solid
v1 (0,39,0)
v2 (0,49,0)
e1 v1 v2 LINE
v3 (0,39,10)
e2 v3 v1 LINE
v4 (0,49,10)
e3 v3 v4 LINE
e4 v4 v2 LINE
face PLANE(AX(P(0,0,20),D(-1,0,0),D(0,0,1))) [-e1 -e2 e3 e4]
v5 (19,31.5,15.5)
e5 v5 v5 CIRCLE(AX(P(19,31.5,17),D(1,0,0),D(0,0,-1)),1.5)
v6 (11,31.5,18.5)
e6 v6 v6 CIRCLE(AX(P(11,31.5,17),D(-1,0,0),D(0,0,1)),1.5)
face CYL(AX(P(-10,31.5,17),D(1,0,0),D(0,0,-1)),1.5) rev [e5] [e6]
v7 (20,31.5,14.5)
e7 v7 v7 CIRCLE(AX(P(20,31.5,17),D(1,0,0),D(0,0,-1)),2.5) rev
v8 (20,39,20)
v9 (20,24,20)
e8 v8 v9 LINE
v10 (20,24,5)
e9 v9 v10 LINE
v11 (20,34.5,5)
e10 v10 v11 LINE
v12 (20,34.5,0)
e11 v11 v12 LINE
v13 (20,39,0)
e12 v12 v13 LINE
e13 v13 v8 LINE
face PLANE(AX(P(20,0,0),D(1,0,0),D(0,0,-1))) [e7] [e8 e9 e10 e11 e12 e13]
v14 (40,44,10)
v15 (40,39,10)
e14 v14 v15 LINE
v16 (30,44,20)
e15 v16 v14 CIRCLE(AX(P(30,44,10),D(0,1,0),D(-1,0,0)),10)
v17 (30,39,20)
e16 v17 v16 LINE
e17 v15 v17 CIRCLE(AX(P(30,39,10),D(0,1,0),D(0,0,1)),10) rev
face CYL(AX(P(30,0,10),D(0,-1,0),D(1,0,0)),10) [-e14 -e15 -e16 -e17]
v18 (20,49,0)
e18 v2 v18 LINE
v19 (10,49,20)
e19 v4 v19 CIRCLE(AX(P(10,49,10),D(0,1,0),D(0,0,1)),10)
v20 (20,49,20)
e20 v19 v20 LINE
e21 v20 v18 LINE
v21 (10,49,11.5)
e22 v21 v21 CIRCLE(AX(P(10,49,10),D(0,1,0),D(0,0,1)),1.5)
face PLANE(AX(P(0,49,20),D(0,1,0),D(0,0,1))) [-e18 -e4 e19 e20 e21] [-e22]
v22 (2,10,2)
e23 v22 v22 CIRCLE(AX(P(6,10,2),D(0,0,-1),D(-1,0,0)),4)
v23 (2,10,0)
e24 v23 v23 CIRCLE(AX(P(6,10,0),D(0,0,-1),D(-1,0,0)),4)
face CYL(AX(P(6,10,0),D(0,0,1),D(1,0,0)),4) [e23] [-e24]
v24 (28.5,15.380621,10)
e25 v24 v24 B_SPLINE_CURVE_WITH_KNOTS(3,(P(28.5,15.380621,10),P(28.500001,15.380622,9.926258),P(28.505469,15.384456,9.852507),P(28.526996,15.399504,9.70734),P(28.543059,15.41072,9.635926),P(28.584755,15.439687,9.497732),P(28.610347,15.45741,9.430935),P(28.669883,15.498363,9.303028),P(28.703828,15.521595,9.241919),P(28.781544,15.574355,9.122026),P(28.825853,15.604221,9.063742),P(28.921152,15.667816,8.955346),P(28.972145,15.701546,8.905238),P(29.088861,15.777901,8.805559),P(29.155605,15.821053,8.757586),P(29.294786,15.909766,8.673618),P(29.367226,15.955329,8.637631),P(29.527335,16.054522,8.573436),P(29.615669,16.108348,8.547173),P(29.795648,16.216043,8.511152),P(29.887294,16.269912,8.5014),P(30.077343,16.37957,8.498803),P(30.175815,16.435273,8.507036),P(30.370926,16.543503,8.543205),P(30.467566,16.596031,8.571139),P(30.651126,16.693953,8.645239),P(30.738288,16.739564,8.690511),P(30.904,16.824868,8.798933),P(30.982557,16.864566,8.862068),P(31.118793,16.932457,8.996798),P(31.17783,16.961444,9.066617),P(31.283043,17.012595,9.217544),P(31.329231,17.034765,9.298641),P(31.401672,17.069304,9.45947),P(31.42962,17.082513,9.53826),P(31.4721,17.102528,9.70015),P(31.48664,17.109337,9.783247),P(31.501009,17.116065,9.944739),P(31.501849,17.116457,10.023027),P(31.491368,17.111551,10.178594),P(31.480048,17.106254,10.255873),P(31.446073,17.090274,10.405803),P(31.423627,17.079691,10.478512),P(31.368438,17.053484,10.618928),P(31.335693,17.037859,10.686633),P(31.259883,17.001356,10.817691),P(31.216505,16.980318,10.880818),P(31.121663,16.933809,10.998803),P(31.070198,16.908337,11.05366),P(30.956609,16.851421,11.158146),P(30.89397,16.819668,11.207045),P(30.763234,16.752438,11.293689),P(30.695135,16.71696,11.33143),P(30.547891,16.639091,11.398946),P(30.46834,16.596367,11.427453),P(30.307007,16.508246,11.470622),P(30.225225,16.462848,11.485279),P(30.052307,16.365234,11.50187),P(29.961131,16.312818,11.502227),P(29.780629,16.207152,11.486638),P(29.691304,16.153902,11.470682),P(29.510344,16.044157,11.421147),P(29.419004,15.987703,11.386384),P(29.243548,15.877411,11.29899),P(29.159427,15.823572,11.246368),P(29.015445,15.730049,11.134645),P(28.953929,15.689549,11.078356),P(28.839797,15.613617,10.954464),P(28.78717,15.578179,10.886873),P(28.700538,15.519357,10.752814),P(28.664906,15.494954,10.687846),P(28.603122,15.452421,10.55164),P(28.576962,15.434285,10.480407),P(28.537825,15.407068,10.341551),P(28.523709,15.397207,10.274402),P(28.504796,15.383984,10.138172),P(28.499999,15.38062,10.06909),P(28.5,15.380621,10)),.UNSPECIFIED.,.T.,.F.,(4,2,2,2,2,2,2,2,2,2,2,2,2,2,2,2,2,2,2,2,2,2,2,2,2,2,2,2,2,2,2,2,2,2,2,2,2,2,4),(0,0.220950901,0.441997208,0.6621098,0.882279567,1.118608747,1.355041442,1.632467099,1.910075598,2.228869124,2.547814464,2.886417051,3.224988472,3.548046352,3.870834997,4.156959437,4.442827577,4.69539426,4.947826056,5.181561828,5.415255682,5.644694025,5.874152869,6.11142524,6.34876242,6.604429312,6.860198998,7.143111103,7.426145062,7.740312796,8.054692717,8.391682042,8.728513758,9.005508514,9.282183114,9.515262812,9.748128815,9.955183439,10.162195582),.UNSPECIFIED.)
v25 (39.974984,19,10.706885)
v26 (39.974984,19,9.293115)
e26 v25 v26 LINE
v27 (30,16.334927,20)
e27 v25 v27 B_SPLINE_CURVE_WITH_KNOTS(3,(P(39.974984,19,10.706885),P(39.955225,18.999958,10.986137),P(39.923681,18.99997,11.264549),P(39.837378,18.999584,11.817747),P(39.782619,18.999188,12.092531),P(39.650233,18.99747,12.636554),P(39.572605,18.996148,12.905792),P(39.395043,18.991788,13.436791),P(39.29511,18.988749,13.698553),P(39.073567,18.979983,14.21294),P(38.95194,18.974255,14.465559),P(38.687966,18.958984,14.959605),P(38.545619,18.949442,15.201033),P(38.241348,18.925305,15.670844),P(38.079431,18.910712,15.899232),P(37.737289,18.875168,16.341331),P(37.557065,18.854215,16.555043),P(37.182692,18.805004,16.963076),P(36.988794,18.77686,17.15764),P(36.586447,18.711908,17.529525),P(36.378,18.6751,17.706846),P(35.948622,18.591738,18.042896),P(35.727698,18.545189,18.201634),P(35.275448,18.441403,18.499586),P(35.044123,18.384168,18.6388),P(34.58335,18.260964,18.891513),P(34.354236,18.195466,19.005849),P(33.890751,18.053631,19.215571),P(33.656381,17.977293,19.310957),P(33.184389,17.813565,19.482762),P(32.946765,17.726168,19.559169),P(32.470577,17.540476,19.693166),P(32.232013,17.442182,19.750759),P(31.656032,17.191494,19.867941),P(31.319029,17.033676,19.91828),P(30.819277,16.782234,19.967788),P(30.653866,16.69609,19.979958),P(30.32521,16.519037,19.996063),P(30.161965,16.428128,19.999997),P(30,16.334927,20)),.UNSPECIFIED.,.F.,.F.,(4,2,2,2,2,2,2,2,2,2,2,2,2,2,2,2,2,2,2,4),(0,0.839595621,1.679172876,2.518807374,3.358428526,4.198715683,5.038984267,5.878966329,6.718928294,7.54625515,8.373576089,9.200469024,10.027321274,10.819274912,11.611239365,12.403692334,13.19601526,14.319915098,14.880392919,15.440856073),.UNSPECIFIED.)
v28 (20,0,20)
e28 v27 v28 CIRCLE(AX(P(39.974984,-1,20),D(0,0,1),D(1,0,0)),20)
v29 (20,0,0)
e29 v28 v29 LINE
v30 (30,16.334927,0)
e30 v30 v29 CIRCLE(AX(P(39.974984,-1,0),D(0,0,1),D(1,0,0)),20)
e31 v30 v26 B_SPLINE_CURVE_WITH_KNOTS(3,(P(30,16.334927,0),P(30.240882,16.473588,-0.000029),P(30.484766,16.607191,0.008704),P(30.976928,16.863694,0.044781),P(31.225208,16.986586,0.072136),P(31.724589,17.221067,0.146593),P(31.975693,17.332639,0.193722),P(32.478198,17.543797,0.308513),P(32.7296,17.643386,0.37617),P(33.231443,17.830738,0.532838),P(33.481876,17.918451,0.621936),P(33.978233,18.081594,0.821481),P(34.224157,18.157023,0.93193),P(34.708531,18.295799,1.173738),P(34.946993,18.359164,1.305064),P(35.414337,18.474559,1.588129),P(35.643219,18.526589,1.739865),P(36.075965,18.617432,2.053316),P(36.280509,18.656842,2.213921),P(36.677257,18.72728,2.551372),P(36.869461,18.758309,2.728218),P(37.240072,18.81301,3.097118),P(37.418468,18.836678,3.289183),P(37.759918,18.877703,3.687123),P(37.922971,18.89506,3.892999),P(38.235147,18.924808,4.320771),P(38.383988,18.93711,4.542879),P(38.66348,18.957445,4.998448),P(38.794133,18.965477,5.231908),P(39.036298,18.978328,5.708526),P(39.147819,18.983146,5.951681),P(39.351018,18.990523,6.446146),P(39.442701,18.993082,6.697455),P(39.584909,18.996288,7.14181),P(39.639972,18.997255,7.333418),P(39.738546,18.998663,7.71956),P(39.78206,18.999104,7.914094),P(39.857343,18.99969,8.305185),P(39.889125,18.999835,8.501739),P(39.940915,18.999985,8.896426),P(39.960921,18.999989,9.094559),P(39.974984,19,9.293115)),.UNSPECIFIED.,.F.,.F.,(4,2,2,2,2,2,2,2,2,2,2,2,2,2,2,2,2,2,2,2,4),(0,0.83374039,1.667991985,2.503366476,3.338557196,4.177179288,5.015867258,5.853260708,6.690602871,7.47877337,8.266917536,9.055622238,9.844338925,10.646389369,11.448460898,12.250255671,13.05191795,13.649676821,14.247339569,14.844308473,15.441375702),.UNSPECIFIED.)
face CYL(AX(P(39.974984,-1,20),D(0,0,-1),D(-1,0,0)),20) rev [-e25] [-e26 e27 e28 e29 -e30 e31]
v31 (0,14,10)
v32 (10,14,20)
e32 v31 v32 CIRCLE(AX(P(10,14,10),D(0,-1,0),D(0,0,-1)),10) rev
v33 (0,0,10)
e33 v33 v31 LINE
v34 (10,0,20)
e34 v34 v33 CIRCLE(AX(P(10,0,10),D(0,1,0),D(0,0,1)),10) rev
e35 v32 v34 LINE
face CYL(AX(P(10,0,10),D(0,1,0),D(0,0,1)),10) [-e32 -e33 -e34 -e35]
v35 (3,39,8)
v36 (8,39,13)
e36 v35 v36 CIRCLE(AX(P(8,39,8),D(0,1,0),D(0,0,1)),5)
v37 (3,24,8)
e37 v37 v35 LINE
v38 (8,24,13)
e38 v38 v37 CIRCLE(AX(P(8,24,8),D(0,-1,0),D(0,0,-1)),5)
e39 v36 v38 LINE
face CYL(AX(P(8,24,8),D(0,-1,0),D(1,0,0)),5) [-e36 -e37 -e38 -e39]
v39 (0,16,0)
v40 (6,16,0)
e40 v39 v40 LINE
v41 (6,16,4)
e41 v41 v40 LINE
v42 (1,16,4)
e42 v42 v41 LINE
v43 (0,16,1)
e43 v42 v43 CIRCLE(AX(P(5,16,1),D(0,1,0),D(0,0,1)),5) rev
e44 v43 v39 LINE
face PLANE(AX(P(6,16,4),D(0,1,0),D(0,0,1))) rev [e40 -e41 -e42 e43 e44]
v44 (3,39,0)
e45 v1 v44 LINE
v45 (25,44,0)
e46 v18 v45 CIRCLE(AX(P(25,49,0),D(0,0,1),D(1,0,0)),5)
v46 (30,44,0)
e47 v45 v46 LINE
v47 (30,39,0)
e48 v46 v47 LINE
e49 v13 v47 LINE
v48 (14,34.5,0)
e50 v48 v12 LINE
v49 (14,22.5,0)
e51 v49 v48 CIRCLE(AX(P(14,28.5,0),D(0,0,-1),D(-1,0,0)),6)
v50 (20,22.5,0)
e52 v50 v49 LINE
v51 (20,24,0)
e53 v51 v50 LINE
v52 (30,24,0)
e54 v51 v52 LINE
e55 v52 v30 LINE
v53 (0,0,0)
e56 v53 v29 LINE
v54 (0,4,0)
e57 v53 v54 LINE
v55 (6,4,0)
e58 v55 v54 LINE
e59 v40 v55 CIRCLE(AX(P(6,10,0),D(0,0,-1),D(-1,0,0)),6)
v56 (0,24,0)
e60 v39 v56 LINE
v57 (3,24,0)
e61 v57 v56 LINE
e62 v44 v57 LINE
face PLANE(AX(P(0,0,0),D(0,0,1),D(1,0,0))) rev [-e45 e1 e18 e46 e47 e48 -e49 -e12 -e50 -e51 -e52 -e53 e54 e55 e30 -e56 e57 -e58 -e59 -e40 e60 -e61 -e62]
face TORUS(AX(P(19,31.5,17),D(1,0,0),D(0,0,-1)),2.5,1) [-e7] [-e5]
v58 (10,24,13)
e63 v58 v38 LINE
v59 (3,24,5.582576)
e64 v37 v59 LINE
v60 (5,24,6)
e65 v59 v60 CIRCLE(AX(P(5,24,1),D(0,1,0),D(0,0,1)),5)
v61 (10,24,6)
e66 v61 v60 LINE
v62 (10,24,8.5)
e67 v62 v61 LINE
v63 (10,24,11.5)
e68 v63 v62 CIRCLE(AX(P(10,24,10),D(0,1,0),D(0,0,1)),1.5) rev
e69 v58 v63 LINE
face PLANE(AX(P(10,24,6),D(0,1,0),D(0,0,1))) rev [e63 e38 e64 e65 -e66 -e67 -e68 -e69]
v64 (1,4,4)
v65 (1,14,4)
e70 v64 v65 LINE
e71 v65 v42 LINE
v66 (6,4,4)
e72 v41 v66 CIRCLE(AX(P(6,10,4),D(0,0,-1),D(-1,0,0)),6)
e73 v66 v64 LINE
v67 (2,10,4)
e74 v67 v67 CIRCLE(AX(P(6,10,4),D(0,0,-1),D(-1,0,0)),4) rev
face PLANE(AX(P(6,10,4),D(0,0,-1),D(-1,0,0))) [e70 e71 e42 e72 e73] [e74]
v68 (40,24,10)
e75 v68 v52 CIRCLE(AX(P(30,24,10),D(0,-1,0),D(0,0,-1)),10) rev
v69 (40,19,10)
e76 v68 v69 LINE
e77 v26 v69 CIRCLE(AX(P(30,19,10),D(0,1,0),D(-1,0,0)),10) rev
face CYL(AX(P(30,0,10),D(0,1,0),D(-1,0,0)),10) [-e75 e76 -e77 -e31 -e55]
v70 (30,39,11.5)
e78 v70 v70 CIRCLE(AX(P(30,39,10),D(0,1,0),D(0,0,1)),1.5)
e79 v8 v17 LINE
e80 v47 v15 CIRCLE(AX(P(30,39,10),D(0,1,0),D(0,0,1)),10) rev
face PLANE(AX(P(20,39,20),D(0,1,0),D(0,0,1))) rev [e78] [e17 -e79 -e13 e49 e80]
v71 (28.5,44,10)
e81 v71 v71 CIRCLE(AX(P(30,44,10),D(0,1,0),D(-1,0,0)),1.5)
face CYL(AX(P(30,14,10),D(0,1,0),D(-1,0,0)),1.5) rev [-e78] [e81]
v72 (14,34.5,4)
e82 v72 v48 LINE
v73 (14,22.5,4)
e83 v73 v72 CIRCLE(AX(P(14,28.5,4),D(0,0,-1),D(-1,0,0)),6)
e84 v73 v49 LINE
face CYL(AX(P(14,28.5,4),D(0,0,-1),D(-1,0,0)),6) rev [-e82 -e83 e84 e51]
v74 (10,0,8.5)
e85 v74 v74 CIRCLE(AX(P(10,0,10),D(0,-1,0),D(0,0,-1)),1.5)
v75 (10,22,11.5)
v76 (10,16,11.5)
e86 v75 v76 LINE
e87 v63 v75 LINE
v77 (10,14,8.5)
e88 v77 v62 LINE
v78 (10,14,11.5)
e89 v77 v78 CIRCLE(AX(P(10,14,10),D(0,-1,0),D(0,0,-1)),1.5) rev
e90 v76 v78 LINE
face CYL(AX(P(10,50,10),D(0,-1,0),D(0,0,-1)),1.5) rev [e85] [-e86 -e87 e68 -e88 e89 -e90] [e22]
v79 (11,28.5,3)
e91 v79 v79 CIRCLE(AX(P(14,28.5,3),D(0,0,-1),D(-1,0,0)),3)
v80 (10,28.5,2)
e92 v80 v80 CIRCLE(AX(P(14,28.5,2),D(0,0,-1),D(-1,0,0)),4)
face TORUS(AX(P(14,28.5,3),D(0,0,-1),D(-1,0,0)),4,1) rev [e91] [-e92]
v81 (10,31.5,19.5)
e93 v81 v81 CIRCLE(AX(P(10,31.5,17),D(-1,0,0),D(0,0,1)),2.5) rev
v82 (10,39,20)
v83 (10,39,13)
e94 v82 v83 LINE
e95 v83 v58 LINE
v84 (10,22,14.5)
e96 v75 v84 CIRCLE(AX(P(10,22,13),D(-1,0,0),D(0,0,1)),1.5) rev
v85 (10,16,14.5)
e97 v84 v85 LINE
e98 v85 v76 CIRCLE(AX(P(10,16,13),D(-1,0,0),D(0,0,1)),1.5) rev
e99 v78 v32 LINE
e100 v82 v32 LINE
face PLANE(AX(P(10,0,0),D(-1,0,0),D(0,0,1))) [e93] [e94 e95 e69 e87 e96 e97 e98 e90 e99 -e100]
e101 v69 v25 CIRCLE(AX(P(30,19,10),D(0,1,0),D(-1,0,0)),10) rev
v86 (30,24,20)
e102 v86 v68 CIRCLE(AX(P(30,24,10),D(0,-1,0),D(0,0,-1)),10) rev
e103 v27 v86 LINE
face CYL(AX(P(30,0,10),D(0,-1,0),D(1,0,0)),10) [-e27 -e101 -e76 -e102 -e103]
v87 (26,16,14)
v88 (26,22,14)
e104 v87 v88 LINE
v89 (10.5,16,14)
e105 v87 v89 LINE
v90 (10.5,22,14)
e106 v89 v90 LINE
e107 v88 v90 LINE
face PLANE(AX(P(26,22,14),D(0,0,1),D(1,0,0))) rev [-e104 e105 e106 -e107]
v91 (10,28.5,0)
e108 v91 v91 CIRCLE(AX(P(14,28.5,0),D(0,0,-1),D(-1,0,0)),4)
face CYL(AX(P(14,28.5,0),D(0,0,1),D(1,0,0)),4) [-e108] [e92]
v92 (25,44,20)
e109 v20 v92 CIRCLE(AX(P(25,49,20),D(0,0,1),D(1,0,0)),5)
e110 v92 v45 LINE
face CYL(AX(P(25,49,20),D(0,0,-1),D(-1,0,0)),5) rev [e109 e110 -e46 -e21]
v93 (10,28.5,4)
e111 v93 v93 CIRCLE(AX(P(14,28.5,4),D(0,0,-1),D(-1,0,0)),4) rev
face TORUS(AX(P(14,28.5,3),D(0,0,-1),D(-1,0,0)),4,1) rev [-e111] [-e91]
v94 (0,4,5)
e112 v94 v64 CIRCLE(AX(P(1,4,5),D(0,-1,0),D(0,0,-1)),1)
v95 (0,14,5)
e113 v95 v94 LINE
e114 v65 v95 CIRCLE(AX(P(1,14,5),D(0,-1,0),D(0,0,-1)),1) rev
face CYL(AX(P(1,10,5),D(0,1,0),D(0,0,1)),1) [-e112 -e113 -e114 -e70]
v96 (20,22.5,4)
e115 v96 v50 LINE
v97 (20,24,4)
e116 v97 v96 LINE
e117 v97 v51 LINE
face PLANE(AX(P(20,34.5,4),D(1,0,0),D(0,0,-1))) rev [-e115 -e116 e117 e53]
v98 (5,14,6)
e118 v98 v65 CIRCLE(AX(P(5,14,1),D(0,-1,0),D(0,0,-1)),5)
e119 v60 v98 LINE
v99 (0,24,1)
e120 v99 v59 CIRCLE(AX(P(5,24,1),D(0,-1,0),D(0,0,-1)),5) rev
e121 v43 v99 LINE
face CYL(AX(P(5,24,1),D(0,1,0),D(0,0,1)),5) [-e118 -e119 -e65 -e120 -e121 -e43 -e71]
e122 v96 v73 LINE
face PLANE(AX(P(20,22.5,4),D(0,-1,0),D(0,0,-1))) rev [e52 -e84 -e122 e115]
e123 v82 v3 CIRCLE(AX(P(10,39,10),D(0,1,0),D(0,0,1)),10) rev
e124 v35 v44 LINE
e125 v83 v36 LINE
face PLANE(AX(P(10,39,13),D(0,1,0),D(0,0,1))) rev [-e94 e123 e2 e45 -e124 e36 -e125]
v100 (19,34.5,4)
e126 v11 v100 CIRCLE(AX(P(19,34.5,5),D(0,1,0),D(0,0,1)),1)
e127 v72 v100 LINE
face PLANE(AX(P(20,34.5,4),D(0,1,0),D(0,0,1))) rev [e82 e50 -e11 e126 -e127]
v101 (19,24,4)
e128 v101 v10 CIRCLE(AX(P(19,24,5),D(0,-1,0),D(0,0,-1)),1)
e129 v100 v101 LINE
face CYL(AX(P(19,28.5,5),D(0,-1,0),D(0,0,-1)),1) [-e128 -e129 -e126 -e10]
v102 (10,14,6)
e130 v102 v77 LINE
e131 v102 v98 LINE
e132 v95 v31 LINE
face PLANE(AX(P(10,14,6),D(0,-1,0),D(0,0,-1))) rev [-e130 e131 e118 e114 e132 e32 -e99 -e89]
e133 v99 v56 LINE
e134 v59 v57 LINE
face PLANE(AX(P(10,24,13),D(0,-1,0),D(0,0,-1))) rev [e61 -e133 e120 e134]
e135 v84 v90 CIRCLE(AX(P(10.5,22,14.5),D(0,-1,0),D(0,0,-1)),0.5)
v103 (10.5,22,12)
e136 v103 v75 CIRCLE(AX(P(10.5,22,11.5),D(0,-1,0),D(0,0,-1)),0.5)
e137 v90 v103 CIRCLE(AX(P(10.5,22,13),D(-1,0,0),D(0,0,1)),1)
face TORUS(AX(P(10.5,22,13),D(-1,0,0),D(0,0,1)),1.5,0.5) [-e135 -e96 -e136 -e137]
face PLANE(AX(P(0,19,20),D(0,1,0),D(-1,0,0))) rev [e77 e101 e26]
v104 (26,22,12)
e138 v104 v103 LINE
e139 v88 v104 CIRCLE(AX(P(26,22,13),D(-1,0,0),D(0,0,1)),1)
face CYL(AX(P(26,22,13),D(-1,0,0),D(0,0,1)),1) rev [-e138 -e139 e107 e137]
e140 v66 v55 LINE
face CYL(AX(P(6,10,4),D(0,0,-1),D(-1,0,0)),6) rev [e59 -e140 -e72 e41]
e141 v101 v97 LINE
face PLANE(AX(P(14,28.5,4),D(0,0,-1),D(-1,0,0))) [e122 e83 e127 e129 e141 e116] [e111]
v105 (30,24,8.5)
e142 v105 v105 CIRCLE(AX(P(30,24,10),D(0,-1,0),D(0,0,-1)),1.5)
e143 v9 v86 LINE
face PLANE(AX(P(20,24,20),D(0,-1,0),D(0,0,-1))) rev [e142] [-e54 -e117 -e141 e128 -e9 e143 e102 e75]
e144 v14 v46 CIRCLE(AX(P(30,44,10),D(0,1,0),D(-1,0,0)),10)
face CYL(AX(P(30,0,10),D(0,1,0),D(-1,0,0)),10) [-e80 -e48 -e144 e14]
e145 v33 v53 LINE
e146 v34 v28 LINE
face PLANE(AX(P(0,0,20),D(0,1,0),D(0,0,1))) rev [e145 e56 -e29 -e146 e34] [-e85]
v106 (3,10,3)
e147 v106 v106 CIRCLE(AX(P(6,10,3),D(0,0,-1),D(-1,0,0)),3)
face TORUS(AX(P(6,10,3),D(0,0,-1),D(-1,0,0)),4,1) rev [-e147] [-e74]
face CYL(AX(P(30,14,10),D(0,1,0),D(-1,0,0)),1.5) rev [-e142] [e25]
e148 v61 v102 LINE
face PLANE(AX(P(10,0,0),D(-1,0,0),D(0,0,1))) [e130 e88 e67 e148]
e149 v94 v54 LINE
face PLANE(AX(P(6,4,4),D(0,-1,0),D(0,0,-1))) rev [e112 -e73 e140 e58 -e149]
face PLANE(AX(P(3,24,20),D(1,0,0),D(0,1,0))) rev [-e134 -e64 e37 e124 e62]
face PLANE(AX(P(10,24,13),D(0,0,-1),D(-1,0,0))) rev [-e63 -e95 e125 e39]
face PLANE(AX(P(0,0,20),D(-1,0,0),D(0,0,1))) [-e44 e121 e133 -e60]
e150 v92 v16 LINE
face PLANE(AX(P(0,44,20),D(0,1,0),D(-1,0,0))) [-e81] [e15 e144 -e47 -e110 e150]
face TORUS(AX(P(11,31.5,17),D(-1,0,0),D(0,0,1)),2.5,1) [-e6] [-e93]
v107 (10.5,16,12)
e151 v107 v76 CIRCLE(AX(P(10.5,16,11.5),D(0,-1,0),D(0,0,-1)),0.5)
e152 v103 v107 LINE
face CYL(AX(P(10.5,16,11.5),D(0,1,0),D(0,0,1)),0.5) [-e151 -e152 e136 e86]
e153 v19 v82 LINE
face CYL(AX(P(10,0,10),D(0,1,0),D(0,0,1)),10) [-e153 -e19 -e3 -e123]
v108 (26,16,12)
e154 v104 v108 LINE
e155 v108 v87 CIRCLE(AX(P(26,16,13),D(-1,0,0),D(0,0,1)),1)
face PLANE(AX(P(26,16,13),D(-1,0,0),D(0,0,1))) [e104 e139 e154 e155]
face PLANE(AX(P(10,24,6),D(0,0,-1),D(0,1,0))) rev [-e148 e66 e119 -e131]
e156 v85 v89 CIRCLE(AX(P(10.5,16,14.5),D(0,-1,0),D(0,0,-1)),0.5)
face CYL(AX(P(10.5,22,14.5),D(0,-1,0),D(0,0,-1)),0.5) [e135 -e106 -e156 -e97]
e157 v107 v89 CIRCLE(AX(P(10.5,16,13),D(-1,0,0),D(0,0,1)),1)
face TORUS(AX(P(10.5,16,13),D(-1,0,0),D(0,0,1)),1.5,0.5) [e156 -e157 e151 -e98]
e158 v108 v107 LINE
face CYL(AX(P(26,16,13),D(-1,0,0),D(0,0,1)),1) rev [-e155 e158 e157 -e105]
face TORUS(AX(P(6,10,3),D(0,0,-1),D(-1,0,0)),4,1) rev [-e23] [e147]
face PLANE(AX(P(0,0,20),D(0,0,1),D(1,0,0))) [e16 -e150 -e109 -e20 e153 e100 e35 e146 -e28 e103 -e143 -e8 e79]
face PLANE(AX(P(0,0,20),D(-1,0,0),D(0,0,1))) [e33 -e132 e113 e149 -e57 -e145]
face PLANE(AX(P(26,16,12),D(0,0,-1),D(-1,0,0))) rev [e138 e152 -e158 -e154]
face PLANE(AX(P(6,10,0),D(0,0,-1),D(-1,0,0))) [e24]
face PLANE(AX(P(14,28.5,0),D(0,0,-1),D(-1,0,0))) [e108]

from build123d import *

# Parameters (mm, degrees)
SALIENTE_EXTRUIR1_DEPTH = 20
CROQUIS2_R              = 1.5
CORTAR_EXTRUIR1_DEPTH   = 50
CROQUIS5_W              = 20
CROQUIS5_H              = 15
CORTAR_EXTRUIR3_DEPTH   = 20
CROQUIS7_R              = 1.5
CORTAR_EXTRUIR5_DEPTH   = 30
REDONDEO2_DEPTH         = 49
CROQUIS6_R              = 1.5
CORTAR_EXTRUIR4_DEPTH   = 30
REDONDEO3_R             = 10
CROQUIS8_W              = 7
CROQUIS8_H              = 15
CORTAR_EXTRUIR6_DEPTH   = 10
SKETCH1_W               = 3
SKETCH1_H               = 15
CUT_EXTRUDE1_DEPTH      = 20
FILLET1_R               = 5
CUT_EXTRUDE2_DEPTH      = 4
SKETCH5_W               = 14
SKETCH5_H               = 10
CUT_EXTRUDE3_DEPTH      = 10
FILLET6_R               = 5
CUT_EXTRUDE4_DEPTH      = 16
SKETCH3_R               = 3
BOSS_EXTRUDE1_DEPTH     = 2
SKETCH4_R               = 4
BOSS_EXTRUDE2_DEPTH     = 2
FILLET2_R               = 1
FILLET3_R               = 1
FILLET4_R               = 1
FILLET9_R               = 0.5


with BuildPart() as part:
    # Croquis1 → Saliente-Extruir1 (new body)
    with BuildSketch(Plane.XY):
        with BuildLine():
            ThreePointArc((20, 49), (21.464466094, 45.464466094), (25, 44))
            Line((25, 44), (40, 44))
            Line((40, 44), (40, 19))
            Line((40, 19), (39.974984355, 19))
            ThreePointArc((39.974984355, 19), (26.190935603, 13.491376746), (20, 0))
            Line((20, 0), (0, 0))
            Line((0, 0), (0, 49))
            Line((0, 49), (20, 49))
        make_face()
    extrude(amount=SALIENTE_EXTRUIR1_DEPTH)

    # Croquis2 → Cortar-Extruir1 (cut)
    with BuildSketch(Plane.XZ):
        with Locations(Location((10, 10, 0), (0, 0, 270))):
            Circle(CROQUIS2_R)
    extrude(amount=-CORTAR_EXTRUIR1_DEPTH, mode=Mode.SUBTRACT)

    # Croquis5 → Cortar-Extruir3 (cut)
    with BuildSketch(Plane(origin=(40, 0, 0), x_dir=(0, 0, -1), z_dir=(1, 0, 0))):
        with Locations((-10, 31.5)):
            Rectangle(CROQUIS5_W, CROQUIS5_H)
    extrude(amount=-CORTAR_EXTRUIR3_DEPTH, mode=Mode.SUBTRACT)

    # Croquis7 → Cortar-Extruir5 (cut)
    with BuildSketch(Plane(origin=(20, 0, 0), x_dir=(0, 0, -1), z_dir=(1, 0, 0))):
        with Locations((-17, 31.5)):
            Circle(CROQUIS7_R)
    extrude(amount=-CORTAR_EXTRUIR5_DEPTH, mode=Mode.SUBTRACT)

    # Redondeo2: read off the stored shape, not the designer's step
    # Redondeo2 outline → Redondeo2 (cut)
    with BuildSketch(Plane(origin=(0, 0, 0), x_dir=(1, 0, 0), z_dir=(0, 1, 0))):
        with BuildLine():
            ThreePointArc((10, -20), (2.928932188, -17.071067812), (0, -10))
            Line((0, -10), (0, -20))
            Line((0, -20), (10, -20))
        make_face()
    extrude(amount=REDONDEO2_DEPTH, mode=Mode.SUBTRACT)

    # Croquis6 → Cortar-Extruir4 (cut)
    with BuildSketch(Plane(origin=(0, 44, 0), x_dir=(1, 0, 0), z_dir=(0, 1, 0))):
        with Locations(Location((30, -10, 0), (0, 0, 180))):
            Circle(CROQUIS6_R)
    extrude(amount=-CORTAR_EXTRUIR4_DEPTH, mode=Mode.SUBTRACT)

    # Redondeo3
    redondeo3_edges = [part.edges().sort_by_distance(p)[0] for p in [
        (40, 21.5, 0),
        (40, 41.5, 0),
        (40, 21.5, 20),
        (40, 41.5, 20),
    ]]
    fillet(redondeo3_edges, radius=REDONDEO3_R - 0.0001)  # a hair under: the kernel refuses the full size

    # Croquis8 → Cortar-Extruir6 (cut)
    with BuildSketch(Plane.ZY):
        with Locations((16.5, 31.5)):
            Rectangle(CROQUIS8_W, CROQUIS8_H)
    extrude(amount=-CORTAR_EXTRUIR6_DEPTH, mode=Mode.SUBTRACT)

    # Sketch1 → Cut-Extrude1 (cut)
    with BuildSketch(Plane(origin=(0, 0, 0), x_dir=(-1, 0, 0), z_dir=(0, 0, -1))):
        with Locations((-1.5, 31.5)):
            Rectangle(SKETCH1_W, SKETCH1_H)
    extrude(amount=-CUT_EXTRUDE1_DEPTH, mode=Mode.SUBTRACT)

    # Fillet1
    fillet1_edges = [part.edges().sort_by_distance(p)[0] for p in [
        (3, 31.5, 13),
    ]]
    fillet(fillet1_edges, radius=FILLET1_R)

    # Sketch2 → Cut-Extrude2 (cut)
    with BuildSketch(Plane(origin=(0, 0, 0), x_dir=(-1, 0, 0), z_dir=(0, 0, -1))):
        with BuildLine():
            Line((-20, 34.5), (-14, 34.5))
            ThreePointArc((-14, 34.5), (-8, 28.5), (-14, 22.5))
            Line((-14, 22.5), (-20, 22.5))
            Line((-20, 22.5), (-20, 34.5))
        make_face()
        with BuildLine():
            Line((-6, 16), (0, 16))
            Line((0, 16), (0, 4))
            Line((0, 4), (-6, 4))
            ThreePointArc((-6, 4), (-12, 10), (-6, 16))
        make_face()
    extrude(amount=-CUT_EXTRUDE2_DEPTH, mode=Mode.SUBTRACT)

    # Sketch5 → Cut-Extrude3 (cut)
    with BuildSketch(Plane.ZY):
        with Locations((13, 19)):
            Rectangle(SKETCH5_W, SKETCH5_H)
    extrude(amount=-CUT_EXTRUDE3_DEPTH, mode=Mode.SUBTRACT)

    # Fillet6
    # the kernel refuses this fillet: 5 mm, written as the material it takes off along each edge
    with BuildSketch(Plane(origin=(0, 14, 6), x_dir=(1, 0, 0), z_dir=(0, 1, 0))) as fillet6_piece_1:
        with BuildLine():
            CenterArc((FILLET6_R, FILLET6_R), FILLET6_R, 180, 90)
            Line((0, FILLET6_R), (0, 0))
            Line((0, 0), (FILLET6_R, 0))
        make_face()
    extrude(amount=10, mode=Mode.SUBTRACT)

    # Sketch6 → Cut-Extrude4 (cut)
    with BuildSketch(Plane.ZY.offset(-10)):
        with BuildLine():
            Line((12, 16), (12, 22))
            ThreePointArc((12, 22), (13, 23), (14, 22))
            Line((14, 22), (14, 16))
            ThreePointArc((14, 16), (13, 15), (12, 16))
        make_face()
    extrude(amount=-CUT_EXTRUDE4_DEPTH, mode=Mode.SUBTRACT)

    # Sketch3 → Boss-Extrude1 (add)
    with BuildSketch(Plane(origin=(0, 0, 4), x_dir=(-1, 0, 0), z_dir=(0, 0, -1))):
        with Locations((-14, 28.5)):
            Circle(SKETCH3_R)
        with Locations((-6, 10)):
            Circle(SKETCH3_R)
    extrude(amount=BOSS_EXTRUDE1_DEPTH)

    # Sketch4 → Boss-Extrude2 (add)
    with BuildSketch(Plane(origin=(0, 0, 2), x_dir=(-1, 0, 0), z_dir=(0, 0, -1))):
        with Locations((-14, 28.5)):
            Circle(SKETCH4_R)
        with Locations((-6, 10)):
            Circle(SKETCH4_R)
    extrude(amount=BOSS_EXTRUDE2_DEPTH)

    # Fillet2
    fillet2_edges = [part.edges().sort_by_distance(p)[0] for p in [
        (17, 28.5, 4),
        (17, 28.5, 2),
        (9, 10, 4),
        (9, 10, 2),
    ]]
    fillet(fillet2_edges, radius=FILLET2_R - 0.0001)  # a hair under: the kernel refuses the full size

    # Fillet3
    fillet3_edges = [part.edges().sort_by_distance(p)[0] for p in [
        (20, 29.25, 4),
        (0, 9, 4),
    ]]
    fillet(fillet3_edges, radius=FILLET3_R)

    # Fillet4
    fillet4_edges = [part.edges().sort_by_distance(p)[0] for p in [
        (10, 31.5, 18.5),
        (20, 31.5, 18.5),
    ]]
    fillet(fillet4_edges, radius=FILLET4_R)

    # Fillet9
    fillet9_edges = [part.edges().sort_by_distance(p)[0] for p in [
        (10, 15, 13),
        (10, 19, 14),
        (10, 23, 13),
        (10, 19, 12),
    ]]
    fillet(fillet9_edges, radius=FILLET9_R - 0.0001)  # a hair under: the kernel refuses the full size


solid = part.part
